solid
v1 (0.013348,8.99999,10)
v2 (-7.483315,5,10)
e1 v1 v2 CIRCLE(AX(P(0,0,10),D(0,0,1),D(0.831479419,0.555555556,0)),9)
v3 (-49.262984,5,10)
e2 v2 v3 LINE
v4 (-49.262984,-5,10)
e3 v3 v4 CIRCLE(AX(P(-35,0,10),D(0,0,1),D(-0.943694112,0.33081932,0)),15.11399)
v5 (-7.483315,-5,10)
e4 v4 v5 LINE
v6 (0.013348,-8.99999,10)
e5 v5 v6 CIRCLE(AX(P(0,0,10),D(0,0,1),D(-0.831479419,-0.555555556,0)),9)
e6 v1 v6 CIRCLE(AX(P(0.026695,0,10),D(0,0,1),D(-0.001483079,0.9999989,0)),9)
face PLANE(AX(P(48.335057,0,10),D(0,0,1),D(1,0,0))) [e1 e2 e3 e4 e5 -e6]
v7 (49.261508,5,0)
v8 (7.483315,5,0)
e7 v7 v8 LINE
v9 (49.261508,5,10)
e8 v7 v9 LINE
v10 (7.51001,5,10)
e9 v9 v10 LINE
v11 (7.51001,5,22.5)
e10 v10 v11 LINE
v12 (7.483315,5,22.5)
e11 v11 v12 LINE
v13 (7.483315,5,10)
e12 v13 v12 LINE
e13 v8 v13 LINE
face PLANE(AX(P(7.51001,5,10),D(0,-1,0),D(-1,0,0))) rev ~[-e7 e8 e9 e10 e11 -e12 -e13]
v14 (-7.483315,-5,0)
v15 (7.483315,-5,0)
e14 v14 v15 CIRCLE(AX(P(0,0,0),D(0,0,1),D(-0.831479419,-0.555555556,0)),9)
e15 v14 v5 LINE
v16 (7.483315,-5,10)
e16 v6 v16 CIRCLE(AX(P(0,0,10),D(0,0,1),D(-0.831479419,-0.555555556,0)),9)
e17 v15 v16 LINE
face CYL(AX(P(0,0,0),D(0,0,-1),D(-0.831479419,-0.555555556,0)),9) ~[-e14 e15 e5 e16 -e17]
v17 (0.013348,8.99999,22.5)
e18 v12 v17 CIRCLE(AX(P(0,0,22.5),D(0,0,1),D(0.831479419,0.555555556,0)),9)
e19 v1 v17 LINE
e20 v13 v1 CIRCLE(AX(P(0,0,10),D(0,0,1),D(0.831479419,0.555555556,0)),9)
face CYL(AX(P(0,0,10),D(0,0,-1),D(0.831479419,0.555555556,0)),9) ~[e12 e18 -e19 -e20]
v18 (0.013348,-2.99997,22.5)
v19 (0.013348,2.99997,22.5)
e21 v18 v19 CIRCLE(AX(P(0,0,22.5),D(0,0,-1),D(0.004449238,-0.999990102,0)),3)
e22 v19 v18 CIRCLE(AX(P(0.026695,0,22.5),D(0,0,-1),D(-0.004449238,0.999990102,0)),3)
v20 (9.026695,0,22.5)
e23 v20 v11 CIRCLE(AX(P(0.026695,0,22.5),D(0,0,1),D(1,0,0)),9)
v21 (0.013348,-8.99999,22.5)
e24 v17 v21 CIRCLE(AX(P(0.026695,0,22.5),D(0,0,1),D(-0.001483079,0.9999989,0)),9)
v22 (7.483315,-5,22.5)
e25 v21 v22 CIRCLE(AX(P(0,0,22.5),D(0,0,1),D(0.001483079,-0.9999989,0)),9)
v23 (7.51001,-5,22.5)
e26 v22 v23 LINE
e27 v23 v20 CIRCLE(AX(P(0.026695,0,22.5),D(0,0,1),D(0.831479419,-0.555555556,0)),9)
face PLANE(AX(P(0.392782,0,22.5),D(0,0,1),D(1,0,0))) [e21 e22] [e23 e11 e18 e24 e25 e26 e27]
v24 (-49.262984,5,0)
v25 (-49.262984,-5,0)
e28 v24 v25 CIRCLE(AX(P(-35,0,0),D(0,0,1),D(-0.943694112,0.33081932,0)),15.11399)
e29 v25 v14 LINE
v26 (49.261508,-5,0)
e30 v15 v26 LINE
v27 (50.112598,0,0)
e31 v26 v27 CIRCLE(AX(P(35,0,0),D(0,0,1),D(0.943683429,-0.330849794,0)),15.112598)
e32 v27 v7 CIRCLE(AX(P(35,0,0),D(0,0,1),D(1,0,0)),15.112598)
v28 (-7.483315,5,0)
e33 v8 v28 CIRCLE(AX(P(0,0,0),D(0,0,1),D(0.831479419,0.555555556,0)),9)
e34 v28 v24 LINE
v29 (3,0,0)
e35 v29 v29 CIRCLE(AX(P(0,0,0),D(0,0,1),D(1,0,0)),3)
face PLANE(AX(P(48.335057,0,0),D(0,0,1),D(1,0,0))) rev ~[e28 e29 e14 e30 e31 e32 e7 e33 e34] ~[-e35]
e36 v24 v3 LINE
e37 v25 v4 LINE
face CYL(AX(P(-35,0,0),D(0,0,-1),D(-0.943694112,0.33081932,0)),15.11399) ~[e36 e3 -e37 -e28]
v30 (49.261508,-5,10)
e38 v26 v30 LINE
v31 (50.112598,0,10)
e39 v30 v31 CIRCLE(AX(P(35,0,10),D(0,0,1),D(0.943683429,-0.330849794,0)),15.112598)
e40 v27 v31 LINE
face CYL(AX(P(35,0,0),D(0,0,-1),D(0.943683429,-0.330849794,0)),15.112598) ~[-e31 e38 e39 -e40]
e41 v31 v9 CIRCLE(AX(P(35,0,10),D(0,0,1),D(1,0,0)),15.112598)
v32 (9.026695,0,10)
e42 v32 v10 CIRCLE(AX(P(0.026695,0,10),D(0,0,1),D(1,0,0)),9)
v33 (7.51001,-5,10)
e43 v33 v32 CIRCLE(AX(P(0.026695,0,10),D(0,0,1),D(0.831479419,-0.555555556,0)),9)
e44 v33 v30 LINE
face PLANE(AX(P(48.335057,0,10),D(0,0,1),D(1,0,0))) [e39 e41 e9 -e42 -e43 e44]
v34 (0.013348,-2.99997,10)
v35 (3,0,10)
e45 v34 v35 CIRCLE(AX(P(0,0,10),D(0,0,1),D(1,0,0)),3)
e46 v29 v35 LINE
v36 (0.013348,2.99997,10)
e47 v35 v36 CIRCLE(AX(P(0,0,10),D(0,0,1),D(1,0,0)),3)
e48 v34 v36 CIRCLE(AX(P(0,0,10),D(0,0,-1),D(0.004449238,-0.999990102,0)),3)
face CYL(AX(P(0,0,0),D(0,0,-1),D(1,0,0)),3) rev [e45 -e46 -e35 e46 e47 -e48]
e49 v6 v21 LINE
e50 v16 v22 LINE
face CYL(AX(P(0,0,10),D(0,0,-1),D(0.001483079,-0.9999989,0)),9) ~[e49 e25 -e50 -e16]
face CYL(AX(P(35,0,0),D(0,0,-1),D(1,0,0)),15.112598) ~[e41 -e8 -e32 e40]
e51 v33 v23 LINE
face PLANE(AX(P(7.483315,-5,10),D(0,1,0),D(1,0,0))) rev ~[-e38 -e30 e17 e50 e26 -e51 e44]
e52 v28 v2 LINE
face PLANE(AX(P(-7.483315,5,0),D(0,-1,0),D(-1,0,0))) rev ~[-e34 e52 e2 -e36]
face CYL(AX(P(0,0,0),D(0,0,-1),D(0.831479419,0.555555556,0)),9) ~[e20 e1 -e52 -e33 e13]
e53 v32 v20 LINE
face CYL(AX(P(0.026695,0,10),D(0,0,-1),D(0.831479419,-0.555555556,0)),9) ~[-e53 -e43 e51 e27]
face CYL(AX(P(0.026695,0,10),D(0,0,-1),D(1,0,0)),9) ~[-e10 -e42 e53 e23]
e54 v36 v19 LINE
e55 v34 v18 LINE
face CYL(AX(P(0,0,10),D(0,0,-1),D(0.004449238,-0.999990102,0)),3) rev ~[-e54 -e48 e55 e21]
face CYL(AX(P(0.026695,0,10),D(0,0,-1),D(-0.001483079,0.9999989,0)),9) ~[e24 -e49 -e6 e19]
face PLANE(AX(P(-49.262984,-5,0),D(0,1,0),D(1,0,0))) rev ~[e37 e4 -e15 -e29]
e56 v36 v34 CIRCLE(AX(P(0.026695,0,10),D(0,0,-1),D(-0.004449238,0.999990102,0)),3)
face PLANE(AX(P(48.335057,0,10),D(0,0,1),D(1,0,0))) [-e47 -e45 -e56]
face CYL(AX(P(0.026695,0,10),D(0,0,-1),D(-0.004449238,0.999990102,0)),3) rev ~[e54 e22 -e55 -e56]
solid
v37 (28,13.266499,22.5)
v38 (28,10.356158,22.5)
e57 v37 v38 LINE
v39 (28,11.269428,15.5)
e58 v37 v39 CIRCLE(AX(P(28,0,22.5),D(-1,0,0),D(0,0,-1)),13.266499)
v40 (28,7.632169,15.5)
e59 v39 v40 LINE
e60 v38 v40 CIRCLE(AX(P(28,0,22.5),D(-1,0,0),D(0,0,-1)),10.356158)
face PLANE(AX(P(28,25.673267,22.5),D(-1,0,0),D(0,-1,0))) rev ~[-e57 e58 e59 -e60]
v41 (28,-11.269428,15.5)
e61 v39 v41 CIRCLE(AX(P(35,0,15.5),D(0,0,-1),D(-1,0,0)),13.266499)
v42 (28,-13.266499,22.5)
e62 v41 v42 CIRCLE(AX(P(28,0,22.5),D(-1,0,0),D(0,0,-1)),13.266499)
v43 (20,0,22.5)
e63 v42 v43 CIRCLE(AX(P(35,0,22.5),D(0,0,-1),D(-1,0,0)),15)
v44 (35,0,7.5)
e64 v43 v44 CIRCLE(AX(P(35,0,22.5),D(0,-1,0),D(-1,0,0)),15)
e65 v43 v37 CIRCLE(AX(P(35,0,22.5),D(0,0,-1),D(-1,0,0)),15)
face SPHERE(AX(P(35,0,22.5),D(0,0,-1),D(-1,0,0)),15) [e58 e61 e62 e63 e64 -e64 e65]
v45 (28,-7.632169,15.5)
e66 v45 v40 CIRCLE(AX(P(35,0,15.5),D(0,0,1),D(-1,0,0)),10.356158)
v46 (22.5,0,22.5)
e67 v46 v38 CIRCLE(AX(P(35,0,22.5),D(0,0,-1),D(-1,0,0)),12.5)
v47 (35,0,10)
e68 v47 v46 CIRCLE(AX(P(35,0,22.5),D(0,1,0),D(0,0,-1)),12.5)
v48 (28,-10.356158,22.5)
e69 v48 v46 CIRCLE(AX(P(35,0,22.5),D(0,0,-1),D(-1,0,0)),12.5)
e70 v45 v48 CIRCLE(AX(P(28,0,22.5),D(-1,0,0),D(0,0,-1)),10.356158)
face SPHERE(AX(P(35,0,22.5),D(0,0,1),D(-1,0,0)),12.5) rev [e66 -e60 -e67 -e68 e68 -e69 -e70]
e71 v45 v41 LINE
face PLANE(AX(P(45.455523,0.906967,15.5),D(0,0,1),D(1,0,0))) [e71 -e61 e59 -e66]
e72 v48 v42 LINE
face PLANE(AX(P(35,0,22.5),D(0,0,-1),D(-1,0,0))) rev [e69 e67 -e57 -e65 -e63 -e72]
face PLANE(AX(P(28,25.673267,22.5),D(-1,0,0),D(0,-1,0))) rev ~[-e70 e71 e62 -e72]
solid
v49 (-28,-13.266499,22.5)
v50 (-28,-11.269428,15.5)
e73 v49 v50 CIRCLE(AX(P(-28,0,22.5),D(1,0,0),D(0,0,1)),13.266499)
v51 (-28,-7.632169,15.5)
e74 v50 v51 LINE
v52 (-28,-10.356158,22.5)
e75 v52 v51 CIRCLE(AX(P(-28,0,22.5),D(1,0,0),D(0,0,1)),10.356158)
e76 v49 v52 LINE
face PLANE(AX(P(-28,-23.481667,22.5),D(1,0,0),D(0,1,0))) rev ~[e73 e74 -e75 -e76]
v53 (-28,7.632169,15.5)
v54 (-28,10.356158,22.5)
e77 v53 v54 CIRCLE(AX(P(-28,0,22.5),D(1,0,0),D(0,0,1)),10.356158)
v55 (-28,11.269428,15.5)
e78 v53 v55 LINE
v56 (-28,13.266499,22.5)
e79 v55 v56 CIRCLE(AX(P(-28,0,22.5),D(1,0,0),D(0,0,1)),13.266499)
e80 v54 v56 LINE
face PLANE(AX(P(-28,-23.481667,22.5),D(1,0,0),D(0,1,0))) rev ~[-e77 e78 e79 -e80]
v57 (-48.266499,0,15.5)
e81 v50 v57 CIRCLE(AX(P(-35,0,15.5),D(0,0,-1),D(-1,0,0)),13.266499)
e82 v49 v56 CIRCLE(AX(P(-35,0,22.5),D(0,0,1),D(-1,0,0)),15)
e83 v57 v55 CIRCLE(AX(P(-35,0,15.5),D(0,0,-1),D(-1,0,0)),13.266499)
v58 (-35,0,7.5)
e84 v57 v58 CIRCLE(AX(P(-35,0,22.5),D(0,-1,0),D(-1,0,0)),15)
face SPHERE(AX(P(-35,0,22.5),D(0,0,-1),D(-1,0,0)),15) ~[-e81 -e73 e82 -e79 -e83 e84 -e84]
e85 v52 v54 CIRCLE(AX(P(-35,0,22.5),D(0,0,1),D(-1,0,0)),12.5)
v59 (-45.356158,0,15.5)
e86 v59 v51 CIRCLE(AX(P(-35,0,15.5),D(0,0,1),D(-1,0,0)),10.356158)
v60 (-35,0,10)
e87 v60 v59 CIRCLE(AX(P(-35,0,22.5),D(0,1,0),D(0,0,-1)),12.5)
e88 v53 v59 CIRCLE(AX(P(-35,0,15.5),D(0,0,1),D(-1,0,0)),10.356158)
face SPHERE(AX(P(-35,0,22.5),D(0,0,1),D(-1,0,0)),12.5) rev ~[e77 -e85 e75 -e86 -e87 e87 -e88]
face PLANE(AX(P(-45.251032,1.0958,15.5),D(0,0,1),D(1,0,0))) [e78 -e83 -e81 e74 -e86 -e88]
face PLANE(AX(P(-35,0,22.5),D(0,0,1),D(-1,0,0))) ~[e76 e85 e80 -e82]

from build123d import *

# Parameters (mm, degrees)
F1_R     = 3
F2_DEPTH = 10
F6_W     = 34.5020639661
F6_H     = 49.154933542
F7_DEPTH = 7
F9_DEPTH = 12.5


with BuildPart() as f2:
    # F1 (on Top) → F2 (new body)
    with BuildSketch(Plane.XY):
        with BuildLine():
            ThreePointArc((46.4564392374, 5), (47.2363289116, 2.5538705461), (47.5, 0))
            ThreePointArc((47.5, 0), (47.2363289116, -2.5538705461), (46.4564392374, -5))
            Line((46.4564392374, -5), (49.2615084811, -5))
            ThreePointArc((49.2615084811, -5), (49.8983064719, -2.5359590739), (50.1125981935, 0))
            ThreePointArc((50.1125981935, 0), (49.8983064719, 2.5359590739), (49.2615084811, 5))
            Line((49.2615084811, 5), (46.4564392374, 5))
        make_face()
        with BuildLine():
            Line((-46.4564392374, 5), (-49.2629836635, 5))
            ThreePointArc((-49.2629836635, 5), (-50.1139903065, 0), (-49.2629836635, -5))
            Line((-49.2629836635, -5), (-46.4564392374, -5))
            ThreePointArc((-46.4564392374, -5), (-47.5, 0), (-46.4564392374, 5))
        make_face()
        with BuildLine():
            ThreePointArc((-22.5, 0), (-22.7636710884, 2.5538705461), (-23.5435607626, 5))
            Line((-23.5435607626, 5), (-46.4564392374, 5))
            ThreePointArc((-46.4564392374, 5), (-47.5, 0), (-46.4564392374, -5))
            Line((-46.4564392374, -5), (-23.5435607626, -5))
            ThreePointArc((-23.5435607626, -5), (-22.7636710884, -2.5538705461), (-22.5, 0))
        make_face()
        with BuildLine():
            ThreePointArc((-19.8860096935, 0), (-20.1002802071, 2.5359521046), (-20.7370163365, 5))
            Line((-20.7370163365, 5), (-23.5435607626, 5))
            ThreePointArc((-23.5435607626, 5), (-22.7636710884, 2.5538705461), (-22.5, 0))
            ThreePointArc((-22.5, 0), (-22.7636710884, -2.5538705461), (-23.5435607626, -5))
            Line((-23.5435607626, -5), (-20.7370163365, -5))
            ThreePointArc((-20.7370163365, -5), (-20.1002802071, -2.5359521046), (-19.8860096935, 0))
        make_face()
        with BuildLine():
            ThreePointArc((-7.4833147735, -5), (-9, 0), (-7.4833147735, 5))
            Line((-7.4833147735, 5), (-20.7370163365, 5))
            ThreePointArc((-20.7370163365, 5), (-20.1002802071, 2.5359521046), (-19.8860096935, 0))
            ThreePointArc((-19.8860096935, 0), (-20.1002802071, -2.5359521046), (-20.7370163365, -5))
            Line((-20.7370163365, -5), (-7.4833147735, -5))
        make_face()
        with BuildLine():
            ThreePointArc((9, 0), (8.6124860802, 2.6124860802), (7.4833147735, 5))
            Line((7.4833147735, 5), (-7.4833147735, 5))
            ThreePointArc((-7.4833147735, 5), (-9, 0), (-7.4833147735, -5))
            Line((-7.4833147735, -5), (7.4833147735, -5))
            ThreePointArc((7.4833147735, -5), (8.6124860802, -2.6124860802), (9, 0))
        make_face()
        Circle(F1_R, mode=Mode.SUBTRACT)
        with BuildLine():
            ThreePointArc((20.7384915189, -5), (19.8874018065, 0), (20.7384915189, 5))
            Line((20.7384915189, 5), (7.4833147735, 5))
            ThreePointArc((7.4833147735, 5), (8.6124860802, 2.6124860802), (9, 0))
            ThreePointArc((9, 0), (8.6124860802, -2.6124860802), (7.4833147735, -5))
            Line((7.4833147735, -5), (20.7384915189, -5))
        make_face()
        with BuildLine():
            ThreePointArc((23.5435607626, -5), (22.5, 0), (23.5435607626, 5))
            Line((23.5435607626, 5), (20.7384915189, 5))
            ThreePointArc((20.7384915189, 5), (19.8874018065, 0), (20.7384915189, -5))
            Line((20.7384915189, -5), (23.5435607626, -5))
        make_face()
        with BuildLine():
            ThreePointArc((46.4564392374, -5), (47.2363289116, -2.5538705461), (47.5, 0))
            ThreePointArc((47.5, 0), (47.2363289116, 2.5538705461), (46.4564392374, 5))
            Line((46.4564392374, 5), (23.5435607626, 5))
            ThreePointArc((23.5435607626, 5), (22.5, 0), (23.5435607626, -5))
            Line((23.5435607626, -5), (46.4564392374, -5))
        make_face()
        with BuildLine():
            Line((-7.4833147735, 5), (7.4833147735, 5))
            ThreePointArc((7.4833147735, 5), (0, 9), (-7.4833147735, 5))
        make_face()
        with BuildLine():
            ThreePointArc((-7.4833147735, -5), (0, -9), (7.4833147735, -5))
            Line((7.4833147735, -5), (-7.4833147735, -5))
        make_face()
    extrude(amount=F2_DEPTH)

    # F8 (on face) → F9 (join)
    with BuildSketch(Plane.XY.offset(10)):
        with BuildLine():
            ThreePointArc((9.0266954303, 0), (8.6391815104, 2.6124860802), (7.5100102038, 5))
            Line((7.5100102038, 5), (7.4833147735, 5))
            ThreePointArc((7.4833147735, 5), (4.2485253114, 7.9341056634), (0.0133477151, 8.9999901021))
            ThreePointArc((0.0133477151, 8.9999901021), (-8.9733045697, 0), (0.0133477151, -8.9999901021))
            ThreePointArc((0.0133477151, -8.9999901021), (4.2485253114, -7.9341056634), (7.4833147735, -5))
            Line((7.4833147735, -5), (7.5100102038, -5))
            ThreePointArc((7.5100102038, -5), (8.6391815104, -2.6124860802), (9.0266954303, 0))
        make_face()
        with BuildLine():
            ThreePointArc((0.0133477151, 2.9999703063), (2.1432913831, 2.126034236), (3.0266954303, 0))
            ThreePointArc((3.0266954303, 0), (2.1432913831, -2.126034236), (0.0133477151, -2.9999703063))
            ThreePointArc((0.0133477151, -2.9999703063), (-3, 0), (0.0133477151, 2.9999703063))
        make_face(mode=Mode.SUBTRACT)
    extrude(amount=F9_DEPTH)


with BuildPart() as f4:
    # F3 (on Front) → F4 (revolve)
    with BuildSketch(Plane.XZ):
        with BuildLine():
            Line((-47.5, 22.5), (-50, 22.5))
            ThreePointArc((-50, 22.5), (-45.6066017178, 11.8933982822), (-35, 7.5))
            Line((-35, 7.5), (-35, 10))
            ThreePointArc((-35, 10), (-43.8388347648, 13.6611652352), (-47.5, 22.5))
        make_face()
    revolve(axis=Axis((-35, 0, 15.5329470341), (0, 0, 1)))


with BuildPart() as f5:
    # F3 (on Front) → F5 (revolve)
    with BuildSketch(Plane.XZ):
        with BuildLine():
            Line((22.5, 22.5), (20, 22.5))
            ThreePointArc((20, 22.5), (24.3933982822, 11.8933982822), (35, 7.5))
            Line((35, 7.5), (35, 10))
            ThreePointArc((35, 10), (26.1611652352, 13.6611652352), (22.5, 22.5))
        make_face()
    revolve(axis=Axis((35, 0, 11.25), (0, 0, -1)))


with BuildPart() as f7_tool:
    # F6 (on face) → F7 (new body)
    with BuildSketch(Plane.XY.offset(22.5)):
        with BuildLine():
            Line((28, 25.6732665002), (28, 13.2664991614))
            ThreePointArc((28, 13.2664991614), (42.7459666924, 12.8452325787), (50, 0))
            ThreePointArc((50, 0), (42.7459666924, -12.8452325787), (28, -13.2664991614))
            Line((28, -13.2664991614), (28, -23.4816670418))
            Line((28, -23.4816670418), (60.3903114407, -23.4816670418))
            Line((60.3903114407, -23.4816670418), (60.3903114407, 25.6732665002))
            Line((60.3903114407, 25.6732665002), (28, 25.6732665002))
        make_face()
        with Locations((-45.251031983, 1.0957997292)):
            Rectangle(F6_W, F6_H)
        with BuildLine():
            Line((28, 10.3561575886), (28, 0))
            Line((28, 0), (28, -10.3561575886))
            ThreePointArc((28, -10.3561575886), (40.8630196998, -11.0397010829), (47.5, 0))
            ThreePointArc((47.5, 0), (40.8630196998, 11.0397010829), (28, 10.3561575886))
        make_face()
        with BuildLine():
            Line((28, 13.2664991614), (28, 10.3561575886))
            ThreePointArc((28, 10.3561575886), (40.8630196998, 11.0397010829), (47.5, 0))
            ThreePointArc((47.5, 0), (40.8630196998, -11.0397010829), (28, -10.3561575886))
            Line((28, -10.3561575886), (28, -13.2664991614))
            ThreePointArc((28, -13.2664991614), (42.7459666924, -12.8452325787), (50, 0))
            ThreePointArc((50, 0), (42.7459666924, 12.8452325787), (28, 13.2664991614))
        make_face()
    extrude(amount=-F7_DEPTH)


with BuildPart() as f4_1:
    add(f4.part)

    # F7: cut by f7_tool
    add(f7_tool.part, mode=Mode.SUBTRACT)


with BuildPart() as f5_1:
    add(f5.part)

    # F7: cut by f7_tool
    add(f7_tool.part, mode=Mode.SUBTRACT)


solid = Compound([f2.part, f4_1.part, f5_1.part])
